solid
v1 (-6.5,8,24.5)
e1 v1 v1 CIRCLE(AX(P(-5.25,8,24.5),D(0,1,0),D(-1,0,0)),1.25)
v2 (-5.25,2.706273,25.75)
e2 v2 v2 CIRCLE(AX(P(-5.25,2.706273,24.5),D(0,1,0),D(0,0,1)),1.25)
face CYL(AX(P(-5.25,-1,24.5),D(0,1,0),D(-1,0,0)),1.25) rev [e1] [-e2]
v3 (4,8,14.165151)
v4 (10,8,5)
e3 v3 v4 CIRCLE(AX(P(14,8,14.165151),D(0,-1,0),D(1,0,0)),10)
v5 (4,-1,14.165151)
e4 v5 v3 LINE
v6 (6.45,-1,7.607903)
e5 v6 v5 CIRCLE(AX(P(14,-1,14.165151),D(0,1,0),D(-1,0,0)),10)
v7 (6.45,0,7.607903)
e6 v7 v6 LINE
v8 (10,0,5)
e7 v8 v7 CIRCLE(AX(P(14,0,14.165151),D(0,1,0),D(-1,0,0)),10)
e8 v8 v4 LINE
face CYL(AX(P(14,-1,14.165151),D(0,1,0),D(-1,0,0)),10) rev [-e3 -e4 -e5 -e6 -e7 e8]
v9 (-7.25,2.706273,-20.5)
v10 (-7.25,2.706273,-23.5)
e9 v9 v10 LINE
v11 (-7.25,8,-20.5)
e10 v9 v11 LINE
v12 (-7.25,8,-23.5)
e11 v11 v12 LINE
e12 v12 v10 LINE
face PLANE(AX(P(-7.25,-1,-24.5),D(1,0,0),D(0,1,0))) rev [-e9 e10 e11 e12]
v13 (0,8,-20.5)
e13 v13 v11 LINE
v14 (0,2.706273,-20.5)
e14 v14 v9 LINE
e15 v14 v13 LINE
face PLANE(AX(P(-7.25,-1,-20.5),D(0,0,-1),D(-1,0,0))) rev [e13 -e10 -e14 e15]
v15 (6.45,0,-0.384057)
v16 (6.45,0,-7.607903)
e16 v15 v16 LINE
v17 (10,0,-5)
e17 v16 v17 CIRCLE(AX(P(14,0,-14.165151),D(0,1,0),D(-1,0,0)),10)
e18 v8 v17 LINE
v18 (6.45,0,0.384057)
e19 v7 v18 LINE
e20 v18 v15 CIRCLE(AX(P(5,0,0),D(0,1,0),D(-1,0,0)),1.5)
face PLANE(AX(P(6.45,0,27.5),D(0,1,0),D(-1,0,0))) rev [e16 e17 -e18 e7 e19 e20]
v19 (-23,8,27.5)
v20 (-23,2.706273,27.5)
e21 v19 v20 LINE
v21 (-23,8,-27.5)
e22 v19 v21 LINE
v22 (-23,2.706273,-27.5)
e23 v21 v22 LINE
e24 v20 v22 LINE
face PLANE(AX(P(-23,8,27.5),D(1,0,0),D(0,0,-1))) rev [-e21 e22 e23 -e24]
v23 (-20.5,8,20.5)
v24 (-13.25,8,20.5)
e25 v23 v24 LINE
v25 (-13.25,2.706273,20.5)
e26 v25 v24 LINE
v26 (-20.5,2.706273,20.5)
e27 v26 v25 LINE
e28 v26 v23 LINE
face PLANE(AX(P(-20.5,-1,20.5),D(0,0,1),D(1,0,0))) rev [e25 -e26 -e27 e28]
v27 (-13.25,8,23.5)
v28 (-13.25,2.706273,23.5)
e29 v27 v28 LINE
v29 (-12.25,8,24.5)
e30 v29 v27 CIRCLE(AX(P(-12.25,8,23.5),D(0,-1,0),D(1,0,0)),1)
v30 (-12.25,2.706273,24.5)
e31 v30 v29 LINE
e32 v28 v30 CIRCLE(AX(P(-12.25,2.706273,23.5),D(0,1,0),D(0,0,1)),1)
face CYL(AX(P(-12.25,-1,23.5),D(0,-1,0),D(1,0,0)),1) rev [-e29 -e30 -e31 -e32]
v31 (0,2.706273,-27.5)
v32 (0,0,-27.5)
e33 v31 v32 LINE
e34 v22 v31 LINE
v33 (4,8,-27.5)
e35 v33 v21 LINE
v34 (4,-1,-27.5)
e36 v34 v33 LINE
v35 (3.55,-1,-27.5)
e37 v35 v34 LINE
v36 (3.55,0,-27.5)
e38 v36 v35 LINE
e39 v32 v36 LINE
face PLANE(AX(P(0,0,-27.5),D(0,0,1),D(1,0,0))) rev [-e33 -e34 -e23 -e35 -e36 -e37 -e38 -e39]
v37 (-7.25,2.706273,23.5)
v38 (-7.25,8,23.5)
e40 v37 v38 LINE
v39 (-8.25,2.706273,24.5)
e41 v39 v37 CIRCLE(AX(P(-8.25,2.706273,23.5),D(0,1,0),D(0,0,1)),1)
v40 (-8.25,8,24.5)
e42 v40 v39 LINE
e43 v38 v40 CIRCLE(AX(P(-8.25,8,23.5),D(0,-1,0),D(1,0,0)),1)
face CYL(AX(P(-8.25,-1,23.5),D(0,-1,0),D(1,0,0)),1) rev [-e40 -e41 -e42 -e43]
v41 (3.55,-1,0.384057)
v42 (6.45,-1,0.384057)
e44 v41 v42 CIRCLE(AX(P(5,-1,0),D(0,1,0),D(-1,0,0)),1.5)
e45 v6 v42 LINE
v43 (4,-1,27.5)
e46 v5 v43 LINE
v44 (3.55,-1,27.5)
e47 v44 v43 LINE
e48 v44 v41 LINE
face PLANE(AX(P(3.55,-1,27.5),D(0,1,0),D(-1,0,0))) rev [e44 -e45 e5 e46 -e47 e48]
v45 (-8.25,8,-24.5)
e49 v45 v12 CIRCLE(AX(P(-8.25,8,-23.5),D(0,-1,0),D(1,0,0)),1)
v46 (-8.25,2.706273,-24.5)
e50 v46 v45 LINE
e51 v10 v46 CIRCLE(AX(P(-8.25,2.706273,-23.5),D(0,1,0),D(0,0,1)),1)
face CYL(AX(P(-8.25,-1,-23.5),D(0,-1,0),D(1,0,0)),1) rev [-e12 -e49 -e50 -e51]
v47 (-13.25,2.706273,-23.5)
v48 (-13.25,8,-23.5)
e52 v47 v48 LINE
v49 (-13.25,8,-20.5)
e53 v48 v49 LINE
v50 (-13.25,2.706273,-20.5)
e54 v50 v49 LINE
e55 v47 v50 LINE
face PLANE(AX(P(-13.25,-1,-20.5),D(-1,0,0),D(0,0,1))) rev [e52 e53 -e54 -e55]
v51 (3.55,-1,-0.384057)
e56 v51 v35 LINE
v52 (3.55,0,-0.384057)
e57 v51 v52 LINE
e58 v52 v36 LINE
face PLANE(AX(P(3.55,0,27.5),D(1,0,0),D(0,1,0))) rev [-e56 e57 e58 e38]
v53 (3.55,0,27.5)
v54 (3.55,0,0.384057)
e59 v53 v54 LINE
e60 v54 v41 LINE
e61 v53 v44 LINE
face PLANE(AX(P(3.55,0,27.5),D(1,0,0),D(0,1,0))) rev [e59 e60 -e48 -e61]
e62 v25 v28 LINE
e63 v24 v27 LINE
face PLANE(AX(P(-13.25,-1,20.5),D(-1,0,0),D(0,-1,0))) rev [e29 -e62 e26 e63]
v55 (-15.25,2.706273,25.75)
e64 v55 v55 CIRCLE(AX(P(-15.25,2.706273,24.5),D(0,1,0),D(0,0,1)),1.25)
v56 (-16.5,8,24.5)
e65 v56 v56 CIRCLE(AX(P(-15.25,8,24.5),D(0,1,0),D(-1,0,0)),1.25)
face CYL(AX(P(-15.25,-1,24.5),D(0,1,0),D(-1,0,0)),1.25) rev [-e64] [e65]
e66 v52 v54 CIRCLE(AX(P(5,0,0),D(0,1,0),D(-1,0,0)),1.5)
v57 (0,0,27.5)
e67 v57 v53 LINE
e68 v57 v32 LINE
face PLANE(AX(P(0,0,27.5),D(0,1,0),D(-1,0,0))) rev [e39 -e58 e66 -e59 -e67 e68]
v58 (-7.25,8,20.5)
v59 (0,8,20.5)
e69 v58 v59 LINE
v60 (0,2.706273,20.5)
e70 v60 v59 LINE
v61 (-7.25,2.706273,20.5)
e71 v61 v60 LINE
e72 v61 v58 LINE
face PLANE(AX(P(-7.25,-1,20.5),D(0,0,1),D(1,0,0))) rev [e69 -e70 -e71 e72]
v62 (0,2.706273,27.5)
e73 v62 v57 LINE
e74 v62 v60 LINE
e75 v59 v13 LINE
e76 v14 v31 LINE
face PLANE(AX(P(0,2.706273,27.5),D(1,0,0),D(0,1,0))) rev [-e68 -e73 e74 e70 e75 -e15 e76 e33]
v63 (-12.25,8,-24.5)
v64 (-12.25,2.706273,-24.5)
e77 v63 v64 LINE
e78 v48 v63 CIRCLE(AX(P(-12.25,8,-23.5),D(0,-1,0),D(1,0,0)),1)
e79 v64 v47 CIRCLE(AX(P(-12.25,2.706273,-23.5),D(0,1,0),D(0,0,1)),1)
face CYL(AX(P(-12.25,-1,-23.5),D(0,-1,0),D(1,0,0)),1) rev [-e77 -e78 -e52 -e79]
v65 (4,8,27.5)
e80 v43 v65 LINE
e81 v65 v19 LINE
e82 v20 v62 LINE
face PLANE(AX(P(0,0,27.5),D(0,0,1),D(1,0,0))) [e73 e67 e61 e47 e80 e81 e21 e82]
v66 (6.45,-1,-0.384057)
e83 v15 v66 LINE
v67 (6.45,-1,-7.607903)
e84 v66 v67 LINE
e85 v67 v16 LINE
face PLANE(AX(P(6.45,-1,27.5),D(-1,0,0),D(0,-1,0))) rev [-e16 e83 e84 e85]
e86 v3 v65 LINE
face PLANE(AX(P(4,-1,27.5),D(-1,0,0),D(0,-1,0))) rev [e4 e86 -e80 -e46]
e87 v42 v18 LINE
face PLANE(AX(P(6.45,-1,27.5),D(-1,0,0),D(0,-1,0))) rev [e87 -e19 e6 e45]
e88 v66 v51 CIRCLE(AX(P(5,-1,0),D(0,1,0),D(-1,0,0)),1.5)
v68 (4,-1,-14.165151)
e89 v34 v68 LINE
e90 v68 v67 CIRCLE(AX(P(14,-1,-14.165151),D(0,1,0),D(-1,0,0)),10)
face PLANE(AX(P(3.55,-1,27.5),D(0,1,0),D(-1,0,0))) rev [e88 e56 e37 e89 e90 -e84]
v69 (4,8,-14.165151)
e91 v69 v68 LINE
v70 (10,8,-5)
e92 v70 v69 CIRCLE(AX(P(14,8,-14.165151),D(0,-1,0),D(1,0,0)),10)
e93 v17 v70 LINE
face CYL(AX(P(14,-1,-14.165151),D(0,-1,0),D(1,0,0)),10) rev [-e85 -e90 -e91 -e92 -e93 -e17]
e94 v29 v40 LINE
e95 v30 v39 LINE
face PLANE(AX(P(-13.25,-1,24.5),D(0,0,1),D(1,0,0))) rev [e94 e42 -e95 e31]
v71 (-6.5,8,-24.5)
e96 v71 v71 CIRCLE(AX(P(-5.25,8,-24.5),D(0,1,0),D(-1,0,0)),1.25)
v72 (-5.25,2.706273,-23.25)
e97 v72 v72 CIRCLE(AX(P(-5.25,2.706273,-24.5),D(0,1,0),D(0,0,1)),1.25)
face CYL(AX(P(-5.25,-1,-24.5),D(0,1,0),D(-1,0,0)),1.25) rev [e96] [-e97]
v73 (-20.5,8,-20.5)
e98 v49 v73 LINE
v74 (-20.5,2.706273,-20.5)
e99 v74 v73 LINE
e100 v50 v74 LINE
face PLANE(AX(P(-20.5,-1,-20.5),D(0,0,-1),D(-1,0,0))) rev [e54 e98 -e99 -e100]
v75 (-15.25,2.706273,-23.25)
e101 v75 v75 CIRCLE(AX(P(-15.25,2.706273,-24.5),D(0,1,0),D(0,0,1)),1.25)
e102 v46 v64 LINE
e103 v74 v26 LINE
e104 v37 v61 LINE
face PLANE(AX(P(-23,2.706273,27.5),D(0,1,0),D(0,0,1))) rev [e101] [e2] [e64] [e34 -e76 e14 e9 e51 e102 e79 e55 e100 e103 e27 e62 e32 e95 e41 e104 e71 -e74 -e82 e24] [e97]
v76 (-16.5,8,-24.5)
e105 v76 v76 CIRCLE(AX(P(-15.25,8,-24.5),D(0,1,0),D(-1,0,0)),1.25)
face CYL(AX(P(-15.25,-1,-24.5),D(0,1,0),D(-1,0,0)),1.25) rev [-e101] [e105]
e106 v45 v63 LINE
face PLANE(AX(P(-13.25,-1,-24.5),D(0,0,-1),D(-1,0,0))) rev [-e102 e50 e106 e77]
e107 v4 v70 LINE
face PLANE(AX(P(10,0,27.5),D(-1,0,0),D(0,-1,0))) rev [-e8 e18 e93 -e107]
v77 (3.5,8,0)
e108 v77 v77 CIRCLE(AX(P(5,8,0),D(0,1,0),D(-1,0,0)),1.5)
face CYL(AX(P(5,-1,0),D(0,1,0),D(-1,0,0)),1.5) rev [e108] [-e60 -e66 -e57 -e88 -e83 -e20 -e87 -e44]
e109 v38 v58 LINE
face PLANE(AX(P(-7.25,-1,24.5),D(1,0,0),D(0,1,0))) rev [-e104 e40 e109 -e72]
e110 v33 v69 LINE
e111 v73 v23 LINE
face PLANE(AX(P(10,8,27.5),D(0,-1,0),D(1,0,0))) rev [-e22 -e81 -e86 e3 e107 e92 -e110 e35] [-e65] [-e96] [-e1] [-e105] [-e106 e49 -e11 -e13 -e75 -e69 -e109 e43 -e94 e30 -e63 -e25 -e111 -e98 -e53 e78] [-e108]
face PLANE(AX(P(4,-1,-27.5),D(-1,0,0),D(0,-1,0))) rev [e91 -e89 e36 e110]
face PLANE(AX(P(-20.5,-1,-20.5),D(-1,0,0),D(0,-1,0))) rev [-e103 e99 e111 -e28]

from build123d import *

# Parameters (mm, degrees)
MAIN_DEPTH            = 27.5
SERVOSQUAREHOLE_DEPTH = 37.962819157
SKETCH2_R             = 1.5
SKETCH2_R_2           = 1.25
FIXINGHOLE_DEPTH      = 37.962819157
FILLET1_R             = 1
SKETCH4_W             = 6
SKETCH4_H             = 22.5
CUT_EXTRUDE2_DEPTH    = 37.962819157
FILLET2_R             = 10


with BuildPart() as part:
    # Sketch1 → Main (new, symmetric)
    with BuildSketch(Plane.XY):
        Polygon((10, 0), (10, 8), (-23, 8), (-23, 2.706273437), (0, 2.706273437), (0, 0), (3.55, 0), (3.55, -1), (6.45, -1), (6.45, 0), align=None)
    extrude(amount=MAIN_DEPTH, both=True)

    # Sketch3 → ServoSquareHole (cut, through all)
    with BuildSketch(Plane(origin=(0, 8, 0), x_dir=(1, 0, 0), z_dir=(0, 1, 0))):
        Polygon((-20.5, 20.5), (-13.25, 20.5), (-13.25, 24.5), (-7.25, 24.5), (-7.25, 20.5), (0, 20.5), (0, -20.5), (-7.25, -20.5), (-7.25, -24.5), (-13.25, -24.5), (-13.25, -20.5), (-20.5, -20.5), align=None)
    extrude(amount=-SERVOSQUAREHOLE_DEPTH, mode=Mode.SUBTRACT)

    # Sketch2 → FixingHole (cut, through all)
    with BuildSketch(Plane(origin=(0, 8, 0), x_dir=(1, 0, 0), z_dir=(0, 1, 0))):
        with Locations(Location((5, 0, 0), (0, 0, 180))):
            Circle(SKETCH2_R)
        with Locations(Location((-15.25, 24.5, 0), (0, 0, 180))):
            Circle(SKETCH2_R_2)
        with Locations(Location((-15.25, -24.5, 0), (0, 0, 180))):
            Circle(SKETCH2_R_2)
        with Locations(Location((-5.25, 24.5, 0), (0, 0, 180))):
            Circle(SKETCH2_R_2)
        with Locations(Location((-5.25, -24.5, 0), (0, 0, 180))):
            Circle(SKETCH2_R_2)
    extrude(amount=-FIXINGHOLE_DEPTH, mode=Mode.SUBTRACT)

    # Fillet1
    fillet1_edges = [part.edges().sort_by_distance(p)[0] for p in [
        (-13.25, 5.353136719, -24.5),
        (-7.25, 5.353136719, -24.5),
        (-7.25, 5.353136719, 24.5),
        (-13.25, 5.353136719, 24.5),
    ]]
    fillet(fillet1_edges, radius=FILLET1_R)

    # Sketch4 → Cut-Extrude2 (cut, through all)
    with BuildSketch(Plane(origin=(0, 8, 0), x_dir=(1, 0, 0), z_dir=(0, 1, 0))):
        with Locations((7, 16.25)):
            Rectangle(SKETCH4_W, SKETCH4_H)
        with Locations((7, -16.25)):
            Rectangle(SKETCH4_W, SKETCH4_H)
    extrude(amount=-CUT_EXTRUDE2_DEPTH, mode=Mode.SUBTRACT)

    # Fillet2
    # the kernel refuses this fillet: 10 mm, written as the material it adds along each edge
    with BuildSketch(Plane(origin=(4, 8, 5), x_dir=(1, 0, 0), z_dir=(0, -1, 0))) as fillet2_piece_1_section:
        with BuildLine():
            CenterArc((10, 9.16515139), FILLET2_R, 180, 66.421821522)
            Line((0, 9.16515139), (-0.2, 9.16515139))
            Line((-0.2, 9.16515139), (-0.2, 0))
            Line((-0.2, 0), (0, -0.2))
            ThreePointArc((0, -0.2), (3, -0.2), (5.92, -0.183303028))
            Line((5.92, -0.183303028), (6, 0))
        make_face()
    fillet2_piece_1 = extrude(amount=9, mode=Mode.PRIVATE)
    fillet2_piece_1 = split(fillet2_piece_1, bisect_by=Plane(origin=(7.630084013, 0, 5.669805071), z_dir=(0, 1, 0)), keep=Keep.TOP, mode=Mode.PRIVATE)
    fillet2_piece_1 = split(fillet2_piece_1, bisect_by=Plane(origin=(6.45, 4, 5.669805071), z_dir=(1, 0, 0)), keep=Keep.TOP, mode=Mode.PRIVATE)
    add(fillet2_piece_1)
    with BuildSketch(Plane(origin=(4, 8, 5), x_dir=(1, 0, 0), z_dir=(0, -1, 0))) as fillet2_piece_2_section:
        with BuildLine():
            CenterArc((10, 9.16515139), FILLET2_R, 180, 66.421821522)
            Line((0, 9.16515139), (-0.2, 9.16515139))
            Line((-0.2, 9.16515139), (-0.2, 0))
            Line((-0.2, 0), (0, -0.2))
            ThreePointArc((0, -0.2), (3, -0.2), (5.92, -0.183303028))
            Line((5.92, -0.183303028), (6, 0))
        make_face()
    fillet2_piece_2 = extrude(amount=9, mode=Mode.PRIVATE)
    fillet2_piece_2 = split(fillet2_piece_2, bisect_by=Plane(origin=(4.860609572, 0, 7.751217471), z_dir=(0, 1, 0)), keep=Keep.TOP, mode=Mode.PRIVATE)
    fillet2_piece_2 = split(fillet2_piece_2, bisect_by=Plane(origin=(6.45, 4, 7.751217471), z_dir=(-1, 0, 0)), keep=Keep.TOP, mode=Mode.PRIVATE)
    add(fillet2_piece_2)
    with BuildSketch(Plane(origin=(4, 8, 5), x_dir=(1, 0, 0), z_dir=(0, -1, 0))) as fillet2_piece_3_section:
        with BuildLine():
            CenterArc((10, 9.16515139), FILLET2_R, 180, 66.421821522)
            Line((0, 9.16515139), (-0.2, 9.16515139))
            Line((-0.2, 9.16515139), (-0.2, 0))
            Line((-0.2, 0), (0, -0.2))
            ThreePointArc((0, -0.2), (3, -0.2), (5.92, -0.183303028))
            Line((5.92, -0.183303028), (6, 0))
        make_face()
    fillet2_piece_3 = extrude(amount=9, mode=Mode.PRIVATE)
    fillet2_piece_3 = split(fillet2_piece_3, bisect_by=Plane(origin=(4.860609572, 0, 7.751217471), z_dir=(0, -1, 0)), keep=Keep.TOP, mode=Mode.PRIVATE)
    fillet2_piece_3 = split(fillet2_piece_3, bisect_by=Plane(origin=(6.45, -0.5, 7.751217471), z_dir=(-1, 0, 0)), keep=Keep.TOP, mode=Mode.PRIVATE)
    add(fillet2_piece_3)
    with BuildSketch(Plane(origin=(4, 8, -5), x_dir=(0, 0, -1), z_dir=(0, -1, 0))) as fillet2_piece_4_section:
        with BuildLine():
            CenterArc((9.16515139, 10), FILLET2_R, 203.578178478, 66.421821522)
            Line((0, 6), (-0.183303028, 5.92))
            ThreePointArc((-0.183303028, 5.92), (-0.2, 3), (-0.2, 0))
            Line((-0.2, 0), (0, -0.2))
            Line((0, -0.2), (9.16515139, -0.2))
            Line((9.16515139, -0.2), (9.16515139, 0))
        make_face()
    fillet2_piece_4 = extrude(amount=9, mode=Mode.PRIVATE)
    fillet2_piece_4 = split(fillet2_piece_4, bisect_by=Plane(origin=(6.45, 4, -7.751217471), z_dir=(-1, 0, 0)), keep=Keep.TOP, mode=Mode.PRIVATE)
    fillet2_piece_4 = split(fillet2_piece_4, bisect_by=Plane(origin=(4.860609572, 0, -7.751217471), z_dir=(0, 1, 0)), keep=Keep.TOP, mode=Mode.PRIVATE)
    add(fillet2_piece_4)
    with BuildSketch(Plane(origin=(4, 8, -5), x_dir=(0, 0, -1), z_dir=(0, -1, 0))) as fillet2_piece_5_section:
        with BuildLine():
            CenterArc((9.16515139, 10), FILLET2_R, 203.578178478, 66.421821522)
            Line((0, 6), (-0.183303028, 5.92))
            ThreePointArc((-0.183303028, 5.92), (-0.2, 3), (-0.2, 0))
            Line((-0.2, 0), (0, -0.2))
            Line((0, -0.2), (9.16515139, -0.2))
            Line((9.16515139, -0.2), (9.16515139, 0))
        make_face()
    fillet2_piece_5 = extrude(amount=9, mode=Mode.PRIVATE)
    fillet2_piece_5 = split(fillet2_piece_5, bisect_by=Plane(origin=(6.45, 4, -5.669805071), z_dir=(1, 0, 0)), keep=Keep.TOP, mode=Mode.PRIVATE)
    fillet2_piece_5 = split(fillet2_piece_5, bisect_by=Plane(origin=(7.630084013, 0, -5.669805071), z_dir=(0, 1, 0)), keep=Keep.TOP, mode=Mode.PRIVATE)
    add(fillet2_piece_5)
    with BuildSketch(Plane(origin=(4, 8, -5), x_dir=(0, 0, -1), z_dir=(0, -1, 0))) as fillet2_piece_6_section:
        with BuildLine():
            CenterArc((9.16515139, 10), FILLET2_R, 203.578178478, 66.421821522)
            Line((0, 6), (-0.183303028, 5.92))
            ThreePointArc((-0.183303028, 5.92), (-0.2, 3), (-0.2, 0))
            Line((-0.2, 0), (0, -0.2))
            Line((0, -0.2), (9.16515139, -0.2))
            Line((9.16515139, -0.2), (9.16515139, 0))
        make_face()
    fillet2_piece_6 = extrude(amount=9, mode=Mode.PRIVATE)
    fillet2_piece_6 = split(fillet2_piece_6, bisect_by=Plane(origin=(6.45, -0.5, -7.751217471), z_dir=(-1, 0, 0)), keep=Keep.TOP, mode=Mode.PRIVATE)
    fillet2_piece_6 = split(fillet2_piece_6, bisect_by=Plane(origin=(4.860609572, 0, -7.751217471), z_dir=(0, -1, 0)), keep=Keep.TOP, mode=Mode.PRIVATE)
    add(fillet2_piece_6)


solid = part.part
